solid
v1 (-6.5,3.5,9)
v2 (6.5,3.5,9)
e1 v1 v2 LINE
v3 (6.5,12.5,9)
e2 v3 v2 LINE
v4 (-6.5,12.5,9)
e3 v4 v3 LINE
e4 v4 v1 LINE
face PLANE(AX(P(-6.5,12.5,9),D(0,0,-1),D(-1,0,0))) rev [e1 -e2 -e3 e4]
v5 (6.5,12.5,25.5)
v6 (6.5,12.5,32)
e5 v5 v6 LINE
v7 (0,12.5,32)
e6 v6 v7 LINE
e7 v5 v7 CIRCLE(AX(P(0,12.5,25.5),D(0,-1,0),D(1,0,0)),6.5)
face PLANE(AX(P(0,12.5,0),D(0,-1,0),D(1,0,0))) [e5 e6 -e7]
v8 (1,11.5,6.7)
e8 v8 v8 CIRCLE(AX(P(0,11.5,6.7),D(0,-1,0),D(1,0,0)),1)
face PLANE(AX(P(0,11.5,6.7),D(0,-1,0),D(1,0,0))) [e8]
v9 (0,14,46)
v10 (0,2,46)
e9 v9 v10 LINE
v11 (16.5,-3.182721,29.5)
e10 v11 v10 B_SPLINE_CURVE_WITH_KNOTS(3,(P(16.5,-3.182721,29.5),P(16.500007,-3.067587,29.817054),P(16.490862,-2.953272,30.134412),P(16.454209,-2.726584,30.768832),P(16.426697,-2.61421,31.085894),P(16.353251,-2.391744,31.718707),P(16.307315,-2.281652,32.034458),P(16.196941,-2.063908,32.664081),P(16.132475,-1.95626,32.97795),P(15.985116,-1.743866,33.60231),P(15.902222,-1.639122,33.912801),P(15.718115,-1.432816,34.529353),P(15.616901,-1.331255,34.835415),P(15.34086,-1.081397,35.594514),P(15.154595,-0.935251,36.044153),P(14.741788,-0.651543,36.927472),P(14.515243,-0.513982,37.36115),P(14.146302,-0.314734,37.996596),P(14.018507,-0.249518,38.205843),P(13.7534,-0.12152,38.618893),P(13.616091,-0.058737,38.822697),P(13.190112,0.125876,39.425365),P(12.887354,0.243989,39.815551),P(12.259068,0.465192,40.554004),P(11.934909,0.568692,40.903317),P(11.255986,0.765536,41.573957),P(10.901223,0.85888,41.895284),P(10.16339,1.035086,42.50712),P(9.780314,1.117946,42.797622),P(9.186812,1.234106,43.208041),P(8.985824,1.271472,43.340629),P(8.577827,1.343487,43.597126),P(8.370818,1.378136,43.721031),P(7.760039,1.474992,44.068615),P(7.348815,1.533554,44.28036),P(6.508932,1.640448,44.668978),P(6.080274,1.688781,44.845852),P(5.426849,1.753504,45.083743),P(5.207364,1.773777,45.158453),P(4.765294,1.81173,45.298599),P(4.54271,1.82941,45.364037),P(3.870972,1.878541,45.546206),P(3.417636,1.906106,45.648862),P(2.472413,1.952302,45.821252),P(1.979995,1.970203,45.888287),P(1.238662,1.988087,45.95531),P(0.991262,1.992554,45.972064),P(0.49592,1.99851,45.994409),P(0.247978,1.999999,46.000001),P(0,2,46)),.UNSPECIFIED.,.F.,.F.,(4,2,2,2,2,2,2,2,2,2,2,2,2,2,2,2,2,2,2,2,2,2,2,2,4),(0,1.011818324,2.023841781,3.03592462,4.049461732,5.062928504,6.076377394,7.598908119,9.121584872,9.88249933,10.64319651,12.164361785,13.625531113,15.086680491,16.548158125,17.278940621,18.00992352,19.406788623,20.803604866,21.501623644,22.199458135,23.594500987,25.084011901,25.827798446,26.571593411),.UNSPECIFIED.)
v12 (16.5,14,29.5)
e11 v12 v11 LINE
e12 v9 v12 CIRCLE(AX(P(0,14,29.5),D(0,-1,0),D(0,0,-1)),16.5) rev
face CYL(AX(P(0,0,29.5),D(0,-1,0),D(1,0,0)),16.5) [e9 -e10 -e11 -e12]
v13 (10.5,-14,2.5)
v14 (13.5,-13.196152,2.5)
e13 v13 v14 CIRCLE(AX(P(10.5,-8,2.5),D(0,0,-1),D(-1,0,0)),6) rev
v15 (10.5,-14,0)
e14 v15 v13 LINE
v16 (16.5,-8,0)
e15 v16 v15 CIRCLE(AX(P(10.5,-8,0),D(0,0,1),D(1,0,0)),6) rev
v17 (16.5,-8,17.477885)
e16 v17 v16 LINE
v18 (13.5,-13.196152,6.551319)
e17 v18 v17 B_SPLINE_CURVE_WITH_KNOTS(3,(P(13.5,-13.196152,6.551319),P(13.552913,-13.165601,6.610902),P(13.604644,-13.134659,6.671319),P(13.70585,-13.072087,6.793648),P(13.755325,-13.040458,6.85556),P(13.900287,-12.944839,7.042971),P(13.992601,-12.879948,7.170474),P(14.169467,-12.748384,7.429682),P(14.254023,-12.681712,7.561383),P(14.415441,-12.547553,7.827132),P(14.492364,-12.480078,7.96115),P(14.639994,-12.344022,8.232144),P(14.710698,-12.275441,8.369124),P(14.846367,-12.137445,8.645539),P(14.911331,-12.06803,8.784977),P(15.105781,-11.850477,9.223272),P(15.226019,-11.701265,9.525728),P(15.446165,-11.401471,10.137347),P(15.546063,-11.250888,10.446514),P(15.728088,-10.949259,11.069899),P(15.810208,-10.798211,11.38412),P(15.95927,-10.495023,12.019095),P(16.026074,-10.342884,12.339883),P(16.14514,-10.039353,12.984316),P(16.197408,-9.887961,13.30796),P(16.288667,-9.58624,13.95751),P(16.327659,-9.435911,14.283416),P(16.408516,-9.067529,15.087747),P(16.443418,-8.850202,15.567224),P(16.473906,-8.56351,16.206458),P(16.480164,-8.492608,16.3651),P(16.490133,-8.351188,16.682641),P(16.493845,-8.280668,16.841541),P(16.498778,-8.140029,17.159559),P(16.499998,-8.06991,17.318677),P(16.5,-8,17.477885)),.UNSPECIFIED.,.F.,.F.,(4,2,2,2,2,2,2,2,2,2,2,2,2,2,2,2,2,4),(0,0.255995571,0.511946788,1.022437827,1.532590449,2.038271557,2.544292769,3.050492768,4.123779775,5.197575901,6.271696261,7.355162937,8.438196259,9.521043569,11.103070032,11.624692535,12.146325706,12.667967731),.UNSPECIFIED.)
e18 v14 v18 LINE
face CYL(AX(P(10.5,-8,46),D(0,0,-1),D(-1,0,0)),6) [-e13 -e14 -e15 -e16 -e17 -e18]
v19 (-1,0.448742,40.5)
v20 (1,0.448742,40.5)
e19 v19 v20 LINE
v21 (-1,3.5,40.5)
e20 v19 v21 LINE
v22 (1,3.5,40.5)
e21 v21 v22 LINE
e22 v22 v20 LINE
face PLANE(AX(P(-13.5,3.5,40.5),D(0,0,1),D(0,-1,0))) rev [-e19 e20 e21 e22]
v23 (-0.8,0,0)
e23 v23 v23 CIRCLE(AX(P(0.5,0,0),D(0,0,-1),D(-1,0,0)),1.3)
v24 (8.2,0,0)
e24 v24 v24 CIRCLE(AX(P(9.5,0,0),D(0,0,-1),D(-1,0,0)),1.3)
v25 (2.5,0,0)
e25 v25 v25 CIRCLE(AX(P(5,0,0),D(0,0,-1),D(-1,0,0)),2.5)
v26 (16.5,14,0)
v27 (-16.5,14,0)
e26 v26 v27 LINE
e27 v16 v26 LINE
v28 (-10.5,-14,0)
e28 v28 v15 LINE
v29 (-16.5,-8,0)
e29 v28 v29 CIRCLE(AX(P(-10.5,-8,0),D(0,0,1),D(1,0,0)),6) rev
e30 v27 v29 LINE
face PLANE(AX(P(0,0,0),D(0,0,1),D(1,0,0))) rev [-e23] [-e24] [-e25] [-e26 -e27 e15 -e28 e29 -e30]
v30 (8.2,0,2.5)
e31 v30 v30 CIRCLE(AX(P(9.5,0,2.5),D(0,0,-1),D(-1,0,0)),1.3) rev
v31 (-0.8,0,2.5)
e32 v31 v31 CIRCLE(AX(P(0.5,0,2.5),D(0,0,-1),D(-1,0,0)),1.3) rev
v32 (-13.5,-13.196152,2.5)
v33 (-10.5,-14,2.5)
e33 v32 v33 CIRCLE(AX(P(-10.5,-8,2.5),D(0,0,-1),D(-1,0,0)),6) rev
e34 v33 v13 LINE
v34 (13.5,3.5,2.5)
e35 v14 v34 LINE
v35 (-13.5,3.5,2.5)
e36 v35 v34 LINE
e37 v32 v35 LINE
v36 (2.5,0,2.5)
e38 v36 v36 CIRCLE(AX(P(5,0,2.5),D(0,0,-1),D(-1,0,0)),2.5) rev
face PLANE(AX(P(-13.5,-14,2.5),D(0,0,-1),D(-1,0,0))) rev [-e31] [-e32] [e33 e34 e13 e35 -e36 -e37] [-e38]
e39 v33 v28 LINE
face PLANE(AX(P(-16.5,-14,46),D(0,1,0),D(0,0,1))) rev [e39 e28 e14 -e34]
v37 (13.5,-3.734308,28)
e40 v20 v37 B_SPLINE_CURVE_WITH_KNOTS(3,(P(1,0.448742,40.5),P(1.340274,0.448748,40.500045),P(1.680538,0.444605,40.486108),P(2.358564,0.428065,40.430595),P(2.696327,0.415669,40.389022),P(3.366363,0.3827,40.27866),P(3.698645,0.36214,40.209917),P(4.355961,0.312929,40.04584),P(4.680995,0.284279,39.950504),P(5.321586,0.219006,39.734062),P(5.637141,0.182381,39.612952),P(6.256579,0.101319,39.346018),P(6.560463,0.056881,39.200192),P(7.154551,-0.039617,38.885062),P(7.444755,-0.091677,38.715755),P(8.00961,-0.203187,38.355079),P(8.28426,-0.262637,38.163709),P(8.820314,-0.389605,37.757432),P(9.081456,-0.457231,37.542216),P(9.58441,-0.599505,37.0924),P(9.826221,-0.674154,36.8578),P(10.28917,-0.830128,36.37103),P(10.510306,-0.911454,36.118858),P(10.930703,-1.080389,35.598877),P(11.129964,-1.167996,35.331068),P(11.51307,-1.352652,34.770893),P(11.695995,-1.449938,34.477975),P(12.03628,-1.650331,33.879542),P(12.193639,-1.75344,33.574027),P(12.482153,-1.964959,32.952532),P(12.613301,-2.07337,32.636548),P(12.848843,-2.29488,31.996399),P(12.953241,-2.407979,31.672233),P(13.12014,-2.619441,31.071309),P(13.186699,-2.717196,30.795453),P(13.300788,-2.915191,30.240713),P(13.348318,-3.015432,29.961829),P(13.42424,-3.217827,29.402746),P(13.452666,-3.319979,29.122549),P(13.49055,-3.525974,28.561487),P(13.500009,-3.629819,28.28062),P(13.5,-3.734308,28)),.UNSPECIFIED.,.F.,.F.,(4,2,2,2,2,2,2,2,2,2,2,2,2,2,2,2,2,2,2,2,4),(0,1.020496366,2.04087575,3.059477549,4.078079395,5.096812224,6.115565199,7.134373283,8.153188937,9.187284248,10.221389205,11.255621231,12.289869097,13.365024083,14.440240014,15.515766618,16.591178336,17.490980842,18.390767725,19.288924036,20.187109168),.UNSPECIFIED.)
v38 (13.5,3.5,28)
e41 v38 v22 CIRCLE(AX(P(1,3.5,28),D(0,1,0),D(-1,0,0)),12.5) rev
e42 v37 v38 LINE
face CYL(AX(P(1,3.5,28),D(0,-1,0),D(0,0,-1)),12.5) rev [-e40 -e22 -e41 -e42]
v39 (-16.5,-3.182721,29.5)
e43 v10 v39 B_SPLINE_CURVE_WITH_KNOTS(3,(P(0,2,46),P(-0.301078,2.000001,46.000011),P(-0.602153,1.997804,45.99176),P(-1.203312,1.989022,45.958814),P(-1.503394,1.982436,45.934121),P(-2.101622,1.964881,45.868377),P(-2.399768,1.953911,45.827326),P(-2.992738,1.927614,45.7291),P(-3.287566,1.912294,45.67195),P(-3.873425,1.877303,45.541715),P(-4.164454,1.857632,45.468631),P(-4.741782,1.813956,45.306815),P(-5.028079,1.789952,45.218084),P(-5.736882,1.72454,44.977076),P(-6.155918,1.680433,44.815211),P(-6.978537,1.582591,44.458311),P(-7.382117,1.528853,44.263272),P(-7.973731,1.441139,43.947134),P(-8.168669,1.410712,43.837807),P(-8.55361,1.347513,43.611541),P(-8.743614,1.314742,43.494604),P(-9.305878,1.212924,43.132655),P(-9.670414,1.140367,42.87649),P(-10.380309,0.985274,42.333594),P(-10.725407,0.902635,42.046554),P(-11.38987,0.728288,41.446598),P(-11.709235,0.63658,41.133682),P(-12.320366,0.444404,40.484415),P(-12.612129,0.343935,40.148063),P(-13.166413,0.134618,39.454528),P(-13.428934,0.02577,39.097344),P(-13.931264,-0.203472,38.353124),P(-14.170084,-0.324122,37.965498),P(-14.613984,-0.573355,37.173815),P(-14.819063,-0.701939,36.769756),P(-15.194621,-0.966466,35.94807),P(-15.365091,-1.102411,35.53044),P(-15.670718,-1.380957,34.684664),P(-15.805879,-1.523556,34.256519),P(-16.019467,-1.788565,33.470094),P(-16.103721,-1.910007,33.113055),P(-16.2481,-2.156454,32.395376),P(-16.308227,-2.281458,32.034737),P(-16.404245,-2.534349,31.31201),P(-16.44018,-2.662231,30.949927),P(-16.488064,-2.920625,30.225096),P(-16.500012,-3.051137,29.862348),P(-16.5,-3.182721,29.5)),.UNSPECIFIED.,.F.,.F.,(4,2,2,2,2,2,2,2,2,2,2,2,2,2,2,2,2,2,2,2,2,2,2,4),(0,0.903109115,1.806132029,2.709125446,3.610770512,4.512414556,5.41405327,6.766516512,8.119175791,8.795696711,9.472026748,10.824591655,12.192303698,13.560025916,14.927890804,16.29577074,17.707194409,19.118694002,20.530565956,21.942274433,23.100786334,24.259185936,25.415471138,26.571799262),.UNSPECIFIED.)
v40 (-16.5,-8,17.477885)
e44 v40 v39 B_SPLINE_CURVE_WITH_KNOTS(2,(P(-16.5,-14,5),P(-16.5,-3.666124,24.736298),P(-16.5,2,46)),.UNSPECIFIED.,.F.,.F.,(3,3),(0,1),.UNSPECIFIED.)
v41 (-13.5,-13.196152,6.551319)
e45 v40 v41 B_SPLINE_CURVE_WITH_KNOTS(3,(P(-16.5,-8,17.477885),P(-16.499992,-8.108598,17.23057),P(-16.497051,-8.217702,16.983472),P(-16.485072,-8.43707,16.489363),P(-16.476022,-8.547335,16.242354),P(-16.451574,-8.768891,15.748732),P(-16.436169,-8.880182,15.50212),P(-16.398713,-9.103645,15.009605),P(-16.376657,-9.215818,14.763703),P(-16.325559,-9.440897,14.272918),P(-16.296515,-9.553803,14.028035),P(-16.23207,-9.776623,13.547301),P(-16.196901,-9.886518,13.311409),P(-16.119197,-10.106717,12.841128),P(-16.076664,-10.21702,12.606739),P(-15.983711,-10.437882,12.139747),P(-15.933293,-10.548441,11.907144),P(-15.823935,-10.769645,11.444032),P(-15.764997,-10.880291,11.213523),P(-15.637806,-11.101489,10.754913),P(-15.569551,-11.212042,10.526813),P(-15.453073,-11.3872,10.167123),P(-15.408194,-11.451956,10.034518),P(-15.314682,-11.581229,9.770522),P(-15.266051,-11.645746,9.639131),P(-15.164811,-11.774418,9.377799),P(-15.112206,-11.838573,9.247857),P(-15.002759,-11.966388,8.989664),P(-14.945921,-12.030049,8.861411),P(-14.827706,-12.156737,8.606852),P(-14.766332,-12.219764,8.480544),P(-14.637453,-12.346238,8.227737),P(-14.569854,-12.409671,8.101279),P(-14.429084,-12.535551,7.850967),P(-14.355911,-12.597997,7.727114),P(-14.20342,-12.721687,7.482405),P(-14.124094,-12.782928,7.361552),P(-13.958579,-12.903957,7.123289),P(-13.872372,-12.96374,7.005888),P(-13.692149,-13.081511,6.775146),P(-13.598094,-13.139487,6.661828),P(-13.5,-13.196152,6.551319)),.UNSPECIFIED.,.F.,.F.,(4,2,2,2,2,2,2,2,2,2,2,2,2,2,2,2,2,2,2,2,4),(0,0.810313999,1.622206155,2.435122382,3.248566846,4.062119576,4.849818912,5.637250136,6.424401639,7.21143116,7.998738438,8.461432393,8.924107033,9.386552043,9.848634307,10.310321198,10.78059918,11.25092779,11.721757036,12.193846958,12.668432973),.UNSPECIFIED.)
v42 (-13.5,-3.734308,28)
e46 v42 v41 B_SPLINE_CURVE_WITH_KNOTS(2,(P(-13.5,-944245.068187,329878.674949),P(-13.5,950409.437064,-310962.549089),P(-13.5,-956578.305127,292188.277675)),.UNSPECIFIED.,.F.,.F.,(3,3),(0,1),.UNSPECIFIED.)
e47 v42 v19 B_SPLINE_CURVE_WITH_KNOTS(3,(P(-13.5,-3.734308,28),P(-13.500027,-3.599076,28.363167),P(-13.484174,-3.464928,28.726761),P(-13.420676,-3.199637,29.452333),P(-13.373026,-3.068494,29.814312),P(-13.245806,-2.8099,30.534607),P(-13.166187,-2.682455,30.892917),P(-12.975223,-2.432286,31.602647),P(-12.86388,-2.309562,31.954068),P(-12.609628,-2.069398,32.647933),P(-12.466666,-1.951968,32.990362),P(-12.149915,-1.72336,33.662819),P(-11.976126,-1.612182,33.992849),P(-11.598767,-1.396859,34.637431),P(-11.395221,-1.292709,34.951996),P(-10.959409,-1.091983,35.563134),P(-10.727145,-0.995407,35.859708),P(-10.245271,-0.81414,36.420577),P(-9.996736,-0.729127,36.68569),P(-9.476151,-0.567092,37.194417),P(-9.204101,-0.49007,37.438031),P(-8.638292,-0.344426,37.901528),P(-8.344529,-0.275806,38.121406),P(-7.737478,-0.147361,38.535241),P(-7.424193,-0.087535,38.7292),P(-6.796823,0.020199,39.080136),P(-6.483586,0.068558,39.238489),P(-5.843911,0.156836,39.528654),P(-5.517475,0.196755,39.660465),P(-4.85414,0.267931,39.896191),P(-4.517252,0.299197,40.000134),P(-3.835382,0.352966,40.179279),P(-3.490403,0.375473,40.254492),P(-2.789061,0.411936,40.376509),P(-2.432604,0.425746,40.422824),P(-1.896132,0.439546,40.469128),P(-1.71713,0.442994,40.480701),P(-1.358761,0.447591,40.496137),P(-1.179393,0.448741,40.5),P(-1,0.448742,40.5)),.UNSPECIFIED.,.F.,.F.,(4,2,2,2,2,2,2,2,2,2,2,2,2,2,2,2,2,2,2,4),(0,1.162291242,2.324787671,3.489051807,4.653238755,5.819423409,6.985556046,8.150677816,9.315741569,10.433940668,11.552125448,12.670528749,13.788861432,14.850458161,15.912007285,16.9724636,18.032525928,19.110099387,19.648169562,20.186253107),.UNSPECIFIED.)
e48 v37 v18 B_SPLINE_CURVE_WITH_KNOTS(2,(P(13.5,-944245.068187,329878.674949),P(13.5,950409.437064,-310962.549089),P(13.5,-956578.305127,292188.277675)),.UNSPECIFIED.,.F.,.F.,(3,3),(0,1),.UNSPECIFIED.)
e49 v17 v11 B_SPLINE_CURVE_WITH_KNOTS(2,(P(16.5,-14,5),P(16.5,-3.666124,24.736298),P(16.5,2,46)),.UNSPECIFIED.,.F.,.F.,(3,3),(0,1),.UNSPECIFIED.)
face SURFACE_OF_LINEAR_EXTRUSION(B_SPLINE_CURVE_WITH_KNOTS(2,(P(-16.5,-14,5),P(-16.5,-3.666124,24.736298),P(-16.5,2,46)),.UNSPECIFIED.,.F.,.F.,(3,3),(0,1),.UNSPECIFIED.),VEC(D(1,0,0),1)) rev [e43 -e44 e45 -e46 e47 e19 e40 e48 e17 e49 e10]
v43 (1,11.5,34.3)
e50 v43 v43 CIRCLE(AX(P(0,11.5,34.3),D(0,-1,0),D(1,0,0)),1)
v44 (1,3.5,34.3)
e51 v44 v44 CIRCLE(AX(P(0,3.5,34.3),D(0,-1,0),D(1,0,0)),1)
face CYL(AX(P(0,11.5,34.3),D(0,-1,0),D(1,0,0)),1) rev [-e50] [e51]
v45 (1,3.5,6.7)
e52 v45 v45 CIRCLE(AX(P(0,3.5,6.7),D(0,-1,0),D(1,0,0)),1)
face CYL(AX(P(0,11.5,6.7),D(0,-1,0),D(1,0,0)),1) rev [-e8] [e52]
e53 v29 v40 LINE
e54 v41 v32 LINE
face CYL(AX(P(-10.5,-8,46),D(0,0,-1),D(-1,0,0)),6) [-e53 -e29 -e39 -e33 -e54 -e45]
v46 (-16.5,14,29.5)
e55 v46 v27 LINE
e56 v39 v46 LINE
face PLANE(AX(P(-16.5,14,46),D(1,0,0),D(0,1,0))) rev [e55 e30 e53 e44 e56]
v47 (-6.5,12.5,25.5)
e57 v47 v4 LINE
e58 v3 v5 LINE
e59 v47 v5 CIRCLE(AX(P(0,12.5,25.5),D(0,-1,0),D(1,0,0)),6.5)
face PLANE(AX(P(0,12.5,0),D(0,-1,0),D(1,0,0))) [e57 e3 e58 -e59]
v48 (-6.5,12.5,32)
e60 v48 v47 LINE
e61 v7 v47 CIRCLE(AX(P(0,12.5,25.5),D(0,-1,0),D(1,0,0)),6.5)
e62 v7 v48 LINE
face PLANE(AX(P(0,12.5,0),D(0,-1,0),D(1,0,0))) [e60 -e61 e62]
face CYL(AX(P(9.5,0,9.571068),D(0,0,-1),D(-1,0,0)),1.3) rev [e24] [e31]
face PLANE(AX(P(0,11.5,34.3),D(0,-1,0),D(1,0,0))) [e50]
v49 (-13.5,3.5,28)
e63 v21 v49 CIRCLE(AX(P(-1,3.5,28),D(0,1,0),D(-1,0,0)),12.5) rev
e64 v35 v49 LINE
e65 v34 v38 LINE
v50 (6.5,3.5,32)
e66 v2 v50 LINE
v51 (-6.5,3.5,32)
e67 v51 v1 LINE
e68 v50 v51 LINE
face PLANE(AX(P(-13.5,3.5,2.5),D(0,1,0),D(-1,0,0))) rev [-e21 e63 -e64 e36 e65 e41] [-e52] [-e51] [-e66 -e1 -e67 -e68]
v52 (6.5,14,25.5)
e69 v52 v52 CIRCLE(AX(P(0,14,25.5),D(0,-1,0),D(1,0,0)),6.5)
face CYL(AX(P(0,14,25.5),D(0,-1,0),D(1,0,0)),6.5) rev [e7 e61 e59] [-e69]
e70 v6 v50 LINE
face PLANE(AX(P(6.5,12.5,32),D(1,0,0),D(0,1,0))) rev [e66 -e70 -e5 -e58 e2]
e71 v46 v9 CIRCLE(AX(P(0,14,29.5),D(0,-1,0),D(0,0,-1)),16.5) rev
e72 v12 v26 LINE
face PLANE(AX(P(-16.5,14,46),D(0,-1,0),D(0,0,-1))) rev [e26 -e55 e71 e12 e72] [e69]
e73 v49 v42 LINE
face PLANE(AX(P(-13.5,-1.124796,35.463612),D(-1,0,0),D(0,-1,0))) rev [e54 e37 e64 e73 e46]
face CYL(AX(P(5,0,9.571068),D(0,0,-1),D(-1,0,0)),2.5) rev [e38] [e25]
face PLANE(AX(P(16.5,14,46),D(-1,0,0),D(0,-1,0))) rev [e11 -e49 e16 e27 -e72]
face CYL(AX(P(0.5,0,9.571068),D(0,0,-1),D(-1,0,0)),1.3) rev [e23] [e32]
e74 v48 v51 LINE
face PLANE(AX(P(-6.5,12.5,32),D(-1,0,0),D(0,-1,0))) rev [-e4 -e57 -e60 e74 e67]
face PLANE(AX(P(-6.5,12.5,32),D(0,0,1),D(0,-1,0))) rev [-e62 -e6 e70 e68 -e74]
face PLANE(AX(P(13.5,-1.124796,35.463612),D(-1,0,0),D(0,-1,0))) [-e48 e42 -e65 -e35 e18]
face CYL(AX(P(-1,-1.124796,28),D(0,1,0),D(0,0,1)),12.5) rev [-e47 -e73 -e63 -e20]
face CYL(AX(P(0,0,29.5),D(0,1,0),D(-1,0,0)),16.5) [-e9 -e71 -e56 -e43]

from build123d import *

# Parameters (mm, degrees)
SKETCH1_W           = 33
SKETCH1_H           = 28
BOSS_EXTRUDE1_DEPTH = 46
CUT_EXTRUDE1_DEPTH  = 59.318093247
CUT_EXTRUDE2_START  = -3
CUT_EXTRUDE2_DEPTH  = 27
FILLET1_R           = 12.5
FILLET2_R           = 16.5
FILLET3_R           = 6
SKETCH4_W           = 13
SKETCH4_H           = 23
CUT_EXTRUDE3_DEPTH  = 9
SKETCH5_R           = 6.5
CUT_EXTRUDE4_DEPTH  = 56.592265809
SKETCH6_R           = 1
CUT_EXTRUDE6_DEPTH  = 8
SKETCH7_R           = 1.3
SKETCH7_R_2         = 2.5
CUT_EXTRUDE7_DEPTH  = 2.5


with BuildPart() as part:
    # Sketch1 → Boss-Extrude1 (new body)
    with BuildSketch(Plane.XY):
        Rectangle(SKETCH1_W, SKETCH1_H)
    extrude(amount=BOSS_EXTRUDE1_DEPTH)

    # Sketch2 → Cut-Extrude1 (cut, through all)
    with BuildSketch(Plane(origin=(16.5, 0, 0), x_dir=(0, 0, -1), z_dir=(1, 0, 0))):
        with BuildLine():
            Line((-46, 2), (-46, -14))
            Line((-46, -14), (-5, -14))
            add(Edge.make_bspline(
                [(-5, -14), (-24.736297584, -3.666123858), (-46, 2)],
                knots=[0, 0, 0, 1, 1, 1], degree=2))
        make_face()
    extrude(amount=-CUT_EXTRUDE1_DEPTH, mode=Mode.SUBTRACT)

    # Sketch3 → Cut-Extrude2 (cut)
    with BuildSketch(Plane(origin=(16.5, 0, 0), x_dir=(0, 0, -1), z_dir=(1, 0, 0)).offset(CUT_EXTRUDE2_START)):
        with BuildLine():
            Line((-5, -14), (-2.5, -14))
            Line((-2.5, -14), (-2.5, 3.5))
            Line((-2.5, 3.5), (-40.5, 3.5))
            Line((-40.5, 3.5), (-40.5, 0.448741524))
            add(Edge.make_bspline(
                [(-5, -14), (-22.171866916, -5.008853353), (-40.5, 0.448741524)],
                knots=[0, 0, 0, 1, 1, 1], degree=2))
        make_face()
    extrude(amount=-CUT_EXTRUDE2_DEPTH, mode=Mode.SUBTRACT)

    # Fillet1
    fillet1_edges = [part.edges().sort_by_distance(p)[0] for p in [
        (13.5, 1.974370762, 40.5),
        (-13.5, 1.974370762, 40.5),
    ]]
    fillet(fillet1_edges, radius=FILLET1_R)

    # Fillet2
    fillet2_edges = [part.edges().sort_by_distance(p)[0] for p in [
        (16.5, 8, 46),
        (-16.5, 8, 46),
    ]]
    fillet(fillet2_edges, radius=FILLET2_R - 0.0001)  # a hair under: the kernel refuses the full size

    # Fillet3
    fillet3_edges = [part.edges().sort_by_distance(p)[0] for p in [
        (-16.5, -14, 2.5),
        (16.5, -14, 2.5),
    ]]
    fillet(fillet3_edges, radius=FILLET3_R)

    # Sketch4 → Cut-Extrude3 (cut)
    with BuildSketch(Plane.XZ.offset(-3.5)):
        with Locations((0, 20.5)):
            Rectangle(SKETCH4_W, SKETCH4_H)
    extrude(amount=-CUT_EXTRUDE3_DEPTH, mode=Mode.SUBTRACT)

    # Sketch5 → Cut-Extrude4 (cut, through all)
    with BuildSketch(Plane.XZ.offset(-12.5)):
        with Locations((0, 25.5)):
            Circle(SKETCH5_R)
    extrude(amount=-CUT_EXTRUDE4_DEPTH, mode=Mode.SUBTRACT)

    # Sketch6 → Cut-Extrude6 (cut)
    with BuildSketch(Plane.XZ.offset(-3.5)):
        with Locations((0, 34.3)):
            Circle(SKETCH6_R)
        with Locations((0, 6.7)):
            Circle(SKETCH6_R)
    extrude(amount=-CUT_EXTRUDE6_DEPTH, mode=Mode.SUBTRACT)

    # Sketch7 → Cut-Extrude7 (cut)
    with BuildSketch(Plane(origin=(0, 0, 0), x_dir=(-1, 0, 0), z_dir=(0, 0, -1))):
        with Locations((-9.5, 0)):
            Circle(SKETCH7_R)
        with Locations((-5, 0)):
            Circle(SKETCH7_R_2)
        with Locations((-0.5, 0)):
            Circle(SKETCH7_R)
    extrude(amount=-CUT_EXTRUDE7_DEPTH, mode=Mode.SUBTRACT)


solid = part.part
